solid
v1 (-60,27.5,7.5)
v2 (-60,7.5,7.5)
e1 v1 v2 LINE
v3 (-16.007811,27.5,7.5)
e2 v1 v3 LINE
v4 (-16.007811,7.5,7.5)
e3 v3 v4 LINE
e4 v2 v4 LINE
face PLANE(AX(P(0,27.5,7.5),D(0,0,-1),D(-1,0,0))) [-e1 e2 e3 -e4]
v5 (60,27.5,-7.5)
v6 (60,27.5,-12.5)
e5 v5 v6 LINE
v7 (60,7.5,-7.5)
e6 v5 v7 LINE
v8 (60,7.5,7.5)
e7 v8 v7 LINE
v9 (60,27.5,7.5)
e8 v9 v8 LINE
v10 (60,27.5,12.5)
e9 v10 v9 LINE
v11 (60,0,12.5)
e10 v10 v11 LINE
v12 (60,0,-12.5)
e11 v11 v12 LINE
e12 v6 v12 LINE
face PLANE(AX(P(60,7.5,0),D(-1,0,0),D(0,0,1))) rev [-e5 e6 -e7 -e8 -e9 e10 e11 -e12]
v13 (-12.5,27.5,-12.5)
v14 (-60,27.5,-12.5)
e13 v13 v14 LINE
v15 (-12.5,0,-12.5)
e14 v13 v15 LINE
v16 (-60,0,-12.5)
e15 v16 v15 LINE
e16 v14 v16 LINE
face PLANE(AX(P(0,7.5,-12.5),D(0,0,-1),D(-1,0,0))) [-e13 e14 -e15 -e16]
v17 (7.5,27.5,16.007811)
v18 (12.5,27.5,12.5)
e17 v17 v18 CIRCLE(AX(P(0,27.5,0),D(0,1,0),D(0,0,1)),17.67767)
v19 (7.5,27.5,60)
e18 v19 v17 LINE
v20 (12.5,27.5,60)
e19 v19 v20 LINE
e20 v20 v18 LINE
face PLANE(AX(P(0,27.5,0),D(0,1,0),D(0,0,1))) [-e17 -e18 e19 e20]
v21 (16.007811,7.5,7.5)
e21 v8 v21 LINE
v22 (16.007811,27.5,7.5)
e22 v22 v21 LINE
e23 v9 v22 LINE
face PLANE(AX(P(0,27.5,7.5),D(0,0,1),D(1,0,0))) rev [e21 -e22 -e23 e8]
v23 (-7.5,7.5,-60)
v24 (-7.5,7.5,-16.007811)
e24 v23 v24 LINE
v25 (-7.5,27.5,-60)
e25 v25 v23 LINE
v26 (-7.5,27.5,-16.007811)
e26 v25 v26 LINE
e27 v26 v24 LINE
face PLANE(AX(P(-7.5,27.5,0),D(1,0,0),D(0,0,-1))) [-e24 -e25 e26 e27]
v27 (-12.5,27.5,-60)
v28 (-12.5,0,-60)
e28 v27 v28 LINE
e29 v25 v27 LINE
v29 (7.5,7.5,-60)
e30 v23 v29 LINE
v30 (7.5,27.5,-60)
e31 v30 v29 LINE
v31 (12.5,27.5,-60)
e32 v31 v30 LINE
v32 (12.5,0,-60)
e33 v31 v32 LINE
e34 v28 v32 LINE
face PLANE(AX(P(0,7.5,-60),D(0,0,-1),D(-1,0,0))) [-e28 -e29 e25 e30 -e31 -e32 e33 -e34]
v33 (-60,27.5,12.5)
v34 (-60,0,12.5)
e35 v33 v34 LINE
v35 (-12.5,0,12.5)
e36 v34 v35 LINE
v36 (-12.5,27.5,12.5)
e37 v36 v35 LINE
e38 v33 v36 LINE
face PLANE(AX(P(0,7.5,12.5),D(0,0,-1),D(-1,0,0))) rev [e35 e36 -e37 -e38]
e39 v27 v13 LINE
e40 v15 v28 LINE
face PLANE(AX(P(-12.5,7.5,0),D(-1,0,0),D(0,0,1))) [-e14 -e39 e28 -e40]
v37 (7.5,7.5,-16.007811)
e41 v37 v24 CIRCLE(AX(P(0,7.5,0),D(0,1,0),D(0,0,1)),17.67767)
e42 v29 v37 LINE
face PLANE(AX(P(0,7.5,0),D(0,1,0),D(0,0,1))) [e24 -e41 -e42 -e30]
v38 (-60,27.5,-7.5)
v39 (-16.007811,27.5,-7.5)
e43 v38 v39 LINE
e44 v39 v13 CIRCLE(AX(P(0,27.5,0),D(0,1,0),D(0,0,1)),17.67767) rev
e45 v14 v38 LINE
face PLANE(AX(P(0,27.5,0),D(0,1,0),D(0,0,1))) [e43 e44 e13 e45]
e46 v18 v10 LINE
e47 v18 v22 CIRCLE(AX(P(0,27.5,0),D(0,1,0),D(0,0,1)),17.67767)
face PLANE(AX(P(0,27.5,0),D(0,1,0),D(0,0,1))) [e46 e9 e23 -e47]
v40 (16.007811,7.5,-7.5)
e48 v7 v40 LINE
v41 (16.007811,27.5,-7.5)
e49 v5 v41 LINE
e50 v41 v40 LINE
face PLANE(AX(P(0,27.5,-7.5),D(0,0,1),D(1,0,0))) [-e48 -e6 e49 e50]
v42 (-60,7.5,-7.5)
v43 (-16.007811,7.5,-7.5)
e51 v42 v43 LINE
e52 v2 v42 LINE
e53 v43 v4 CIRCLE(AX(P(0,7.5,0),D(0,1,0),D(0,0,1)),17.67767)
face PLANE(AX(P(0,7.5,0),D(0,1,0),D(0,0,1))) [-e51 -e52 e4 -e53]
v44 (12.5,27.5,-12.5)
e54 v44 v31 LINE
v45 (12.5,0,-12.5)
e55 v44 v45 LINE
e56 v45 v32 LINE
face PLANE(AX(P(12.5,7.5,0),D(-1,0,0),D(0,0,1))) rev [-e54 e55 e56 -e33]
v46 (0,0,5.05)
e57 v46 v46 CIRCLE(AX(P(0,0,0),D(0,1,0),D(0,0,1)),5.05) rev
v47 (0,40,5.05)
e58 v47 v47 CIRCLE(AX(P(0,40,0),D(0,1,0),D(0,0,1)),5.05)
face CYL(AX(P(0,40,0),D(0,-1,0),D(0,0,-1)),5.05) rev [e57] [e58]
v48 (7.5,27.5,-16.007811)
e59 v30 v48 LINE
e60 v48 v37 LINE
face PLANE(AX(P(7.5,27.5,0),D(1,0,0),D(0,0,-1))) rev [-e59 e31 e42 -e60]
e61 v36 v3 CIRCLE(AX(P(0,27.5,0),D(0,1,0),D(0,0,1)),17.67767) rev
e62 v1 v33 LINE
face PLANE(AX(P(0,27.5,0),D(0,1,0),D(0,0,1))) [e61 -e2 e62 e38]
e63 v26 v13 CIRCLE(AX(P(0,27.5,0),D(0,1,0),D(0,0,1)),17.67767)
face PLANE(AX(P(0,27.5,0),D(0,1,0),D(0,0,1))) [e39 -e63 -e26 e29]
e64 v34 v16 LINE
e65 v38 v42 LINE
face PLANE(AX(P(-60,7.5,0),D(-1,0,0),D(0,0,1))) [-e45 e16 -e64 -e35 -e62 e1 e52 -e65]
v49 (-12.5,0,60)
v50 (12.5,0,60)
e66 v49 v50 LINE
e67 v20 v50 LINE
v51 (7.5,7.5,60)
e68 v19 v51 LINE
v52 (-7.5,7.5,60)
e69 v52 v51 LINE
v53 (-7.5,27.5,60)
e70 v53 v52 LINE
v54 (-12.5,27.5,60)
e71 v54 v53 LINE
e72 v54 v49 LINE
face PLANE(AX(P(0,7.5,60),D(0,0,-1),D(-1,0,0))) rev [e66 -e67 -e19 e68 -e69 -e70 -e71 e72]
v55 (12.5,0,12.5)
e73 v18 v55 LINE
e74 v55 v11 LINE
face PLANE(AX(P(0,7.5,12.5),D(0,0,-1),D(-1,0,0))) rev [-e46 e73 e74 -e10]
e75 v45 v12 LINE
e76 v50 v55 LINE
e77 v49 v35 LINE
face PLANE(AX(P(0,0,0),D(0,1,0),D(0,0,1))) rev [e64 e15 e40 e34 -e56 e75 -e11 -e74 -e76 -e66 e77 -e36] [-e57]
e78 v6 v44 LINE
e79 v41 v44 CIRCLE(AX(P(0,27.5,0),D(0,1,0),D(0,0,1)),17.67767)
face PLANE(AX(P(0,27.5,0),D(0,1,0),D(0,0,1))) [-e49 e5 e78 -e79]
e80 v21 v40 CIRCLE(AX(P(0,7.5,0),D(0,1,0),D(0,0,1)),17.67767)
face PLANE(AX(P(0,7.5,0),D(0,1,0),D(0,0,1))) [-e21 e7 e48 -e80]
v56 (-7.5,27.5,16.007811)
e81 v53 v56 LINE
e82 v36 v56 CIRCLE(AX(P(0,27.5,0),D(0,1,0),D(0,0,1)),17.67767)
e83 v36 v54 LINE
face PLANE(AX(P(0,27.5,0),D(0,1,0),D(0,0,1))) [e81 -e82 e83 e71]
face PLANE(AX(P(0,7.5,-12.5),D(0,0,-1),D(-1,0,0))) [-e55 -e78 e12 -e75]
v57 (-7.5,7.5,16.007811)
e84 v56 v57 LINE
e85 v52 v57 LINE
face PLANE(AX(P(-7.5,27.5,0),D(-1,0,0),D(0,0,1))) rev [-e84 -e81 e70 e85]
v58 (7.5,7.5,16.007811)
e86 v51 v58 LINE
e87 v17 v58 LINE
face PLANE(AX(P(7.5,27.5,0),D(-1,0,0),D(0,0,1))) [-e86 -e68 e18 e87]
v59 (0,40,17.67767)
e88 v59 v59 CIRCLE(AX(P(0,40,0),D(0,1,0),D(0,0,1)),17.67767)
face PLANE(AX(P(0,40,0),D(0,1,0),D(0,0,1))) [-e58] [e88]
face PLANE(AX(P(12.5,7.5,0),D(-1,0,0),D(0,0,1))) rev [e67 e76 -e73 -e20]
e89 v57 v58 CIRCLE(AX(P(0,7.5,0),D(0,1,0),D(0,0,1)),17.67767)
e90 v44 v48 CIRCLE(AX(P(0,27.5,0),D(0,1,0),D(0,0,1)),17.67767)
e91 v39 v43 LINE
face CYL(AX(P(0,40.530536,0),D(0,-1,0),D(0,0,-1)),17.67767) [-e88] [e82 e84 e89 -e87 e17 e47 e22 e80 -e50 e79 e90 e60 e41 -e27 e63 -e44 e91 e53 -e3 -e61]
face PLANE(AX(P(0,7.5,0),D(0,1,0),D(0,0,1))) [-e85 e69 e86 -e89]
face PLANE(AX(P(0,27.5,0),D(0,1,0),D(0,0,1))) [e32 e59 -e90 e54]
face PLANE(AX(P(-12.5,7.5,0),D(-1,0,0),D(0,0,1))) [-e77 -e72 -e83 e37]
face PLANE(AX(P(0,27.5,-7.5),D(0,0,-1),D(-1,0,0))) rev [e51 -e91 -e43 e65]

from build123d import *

# Parameters (mm, degrees)
BOSS_EXTRUDE1_DEPTH     = 7.5
BOSS_EXTRUDE1_2_DEPTH   = 7.5
BOSS_EXTRUDE1_3_DEPTH   = 7.5
BOSS_EXTRUDE1_4_DEPTH   = 7.5
SKETCH1_3_W             = 25
SKETCH1_3_H             = 25
SKETCH1_3_R             = 5.05
BOSS_EXTRUDE2_DEPTH     = 15
BOSS_EXTRUDE5_DEPTH     = 7.5
BOSS_EXTRUDE8_DEPTH     = 15
SKETCH1_8_R             = 17.67766953
BOSS_EXTRUDE9_DEPTH     = 40
BOSS_EXTRUDE10_DEPTH    = 20
CUT_EXTRUDE1_DEPTH      = 94.808315196
CUT_EXTRUDE1_DEPTH_BACK = 94.808315196
SKETCH1_9_R             = 5.05


# Read off the part's stored shape, not the designer's step: Boss-Extrude5
with BuildPart() as part:
    # Sketch1 → Boss-Extrude1 (new body)
    with BuildSketch(Plane(origin=(0, 0, 0), x_dir=(1, 0, 0), z_dir=(0, 1, 0))):
        with BuildLine():
            Line((-60, 12.5), (-60, -12.5))
            Line((-60, -12.5), (-12.5, -12.5))
            ThreePointArc((-12.5, -12.5), (-17.67766953, 0), (-12.5, 12.5))
            Line((-12.5, 12.5), (-60, 12.5))
        make_face()
    extrude(amount=BOSS_EXTRUDE1_DEPTH)



with BuildPart() as body_2:
    # Sketch1 → Boss-Extrude1 2 (new body)
    with BuildSketch(Plane(origin=(0, 0, 0), x_dir=(1, 0, 0), z_dir=(0, 1, 0))):
        with BuildLine():
            ThreePointArc((12.5, -12.5), (0, -17.67766953), (-12.5, -12.5))
            Line((-12.5, -12.5), (-12.5, -60))
            Line((-12.5, -60), (12.5, -60))
            Line((12.5, -60), (12.5, -12.5))
        make_face()
    extrude(amount=BOSS_EXTRUDE1_2_DEPTH)


with BuildPart() as body_3:
    # Sketch1 → Boss-Extrude1 3 (new body)
    with BuildSketch(Plane(origin=(0, 0, 0), x_dir=(1, 0, 0), z_dir=(0, 1, 0))):
        with BuildLine():
            ThreePointArc((12.5, 12.5), (17.67766953, 0), (12.5, -12.5))
            Line((12.5, -12.5), (60, -12.5))
            Line((60, -12.5), (60, 12.5))
            Line((60, 12.5), (12.5, 12.5))
        make_face()
    extrude(amount=BOSS_EXTRUDE1_3_DEPTH)


with BuildPart() as body_4:
    # Sketch1 → Boss-Extrude1 4 (new body)
    with BuildSketch(Plane(origin=(0, 0, 0), x_dir=(1, 0, 0), z_dir=(0, 1, 0))):
        with BuildLine():
            Line((-12.5, 60), (-12.5, 12.5))
            ThreePointArc((-12.5, 12.5), (0, 17.67766953), (12.5, 12.5))
            Line((12.5, 12.5), (12.5, 60))
            Line((12.5, 60), (-12.5, 60))
        make_face()
    extrude(amount=BOSS_EXTRUDE1_4_DEPTH)


with BuildPart() as body_5:
    # Sketch1<3> → Boss-Extrude2 (new body)
    with BuildSketch(Plane(origin=(0, 0, 0), x_dir=(1, 0, 0), z_dir=(0, 1, 0))):
        Rectangle(SKETCH1_3_W, SKETCH1_3_H)
        with Locations(Location((0, 0, 0), (0, 0, 270))):
            Circle(SKETCH1_3_R, mode=Mode.SUBTRACT)
    extrude(amount=BOSS_EXTRUDE2_DEPTH)


with BuildPart() as body_6:
    # Boss-Extrude5 outline → Boss-Extrude5 (new body)
    with BuildSketch(Plane(origin=(0, 0, 0), x_dir=(1, 0, 0), z_dir=(0, 1, 0))):
        with BuildLine():
            Line((-12.5, 60), (-12.5, 12.5))
            ThreePointArc((-12.5, 12.5), (0, 17.67766953), (12.5, 12.5))
            Line((12.5, 12.5), (12.5, 60))
            Line((12.5, 60), (-12.5, 60))
        make_face()
    extrude(amount=BOSS_EXTRUDE5_DEPTH)


with BuildPart() as part_1:
    add(part.part)

    add(body_2.part)  # Boss-Extrude8 merges body 2

    add(body_3.part)  # Boss-Extrude8 merges body 3

    add(body_4.part)  # Boss-Extrude8 merges body 4

    add(body_5.part)  # Boss-Extrude8 merges body 5

    add(body_6.part)  # Boss-Extrude8 merges body 6
    # Sketch1<7> → Boss-Extrude8 (add)
    with BuildSketch(Plane(origin=(0, 0, 0), x_dir=(1, 0, 0), z_dir=(0, 1, 0))):
        with BuildLine():
            ThreePointArc((-12.5, 12.5), (-17.67766953, 0), (-12.5, -12.5))
            Line((-12.5, -12.5), (-12.5, 12.5))
        make_face()
        with BuildLine():
            Line((12.5, -12.5), (-12.5, -12.5))
            ThreePointArc((-12.5, -12.5), (0, -17.67766953), (12.5, -12.5))
        make_face()
        with BuildLine():
            Line((12.5, 12.5), (12.5, -12.5))
            ThreePointArc((12.5, -12.5), (16.332037061, -6.764951252), (17.67766953, 0))
            ThreePointArc((17.67766953, 0), (16.332037061, 6.764951252), (12.5, 12.5))
        make_face()
        with BuildLine():
            ThreePointArc((12.5, 12.5), (0, 17.67766953), (-12.5, 12.5))
            Line((-12.5, 12.5), (12.5, 12.5))
        make_face()
    extrude(amount=BOSS_EXTRUDE8_DEPTH)

    # Sketch1<8> → Boss-Extrude9 (add)
    with BuildSketch(Plane(origin=(0, 0, 0), x_dir=(1, 0, 0), z_dir=(0, 1, 0))):
        with Locations(Location((0, 0, 0), (0, 0, 45))):
            Circle(SKETCH1_8_R)
    extrude(amount=BOSS_EXTRUDE9_DEPTH)

    # Sketch5 → Boss-Extrude10 (add)
    with BuildSketch(Plane(origin=(0, 7.5, 0), x_dir=(1, 0, 0), z_dir=(0, 1, 0))):
        with BuildLine():
            Line((-60, 7.5), (-16.007810594, 7.5))
            ThreePointArc((-16.007810594, 7.5), (-14.471482861, 10.152644177), (-12.5, 12.5))
            Line((-12.5, 12.5), (-60, 12.5))
            Line((-60, 12.5), (-60, 7.5))
        make_face()
        with BuildLine():
            Line((-12.5, 60), (-12.5, 12.5))
            ThreePointArc((-12.5, 12.5), (-10.152644177, 14.471482861), (-7.5, 16.007810594))
            Line((-7.5, 16.007810594), (-7.5, 60))
            Line((-7.5, 60), (-12.5, 60))
        make_face()
        with BuildLine():
            Line((7.5, 60), (7.5, 16.007810594))
            ThreePointArc((7.5, 16.007810594), (10.152644177, 14.471482861), (12.5, 12.5))
            Line((12.5, 12.5), (12.5, 60))
            Line((12.5, 60), (7.5, 60))
        make_face()
        with BuildLine():
            ThreePointArc((12.5, 12.5), (14.471482861, 10.152644177), (16.007810594, 7.5))
            Line((16.007810594, 7.5), (60, 7.5))
            Line((60, 7.5), (60, 12.5))
            Line((60, 12.5), (12.5, 12.5))
        make_face()
        with BuildLine():
            ThreePointArc((16.007810594, -7.5), (14.471482861, -10.152644177), (12.5, -12.5))
            Line((12.5, -12.5), (60, -12.5))
            Line((60, -12.5), (60, -7.5))
            Line((60, -7.5), (16.007810594, -7.5))
        make_face()
        with BuildLine():
            ThreePointArc((12.5, -12.5), (10.152644177, -14.471482861), (7.5, -16.007810594))
            Line((7.5, -16.007810594), (7.5, -60))
            Line((7.5, -60), (12.5, -60))
            Line((12.5, -60), (12.5, -12.5))
        make_face()
        with BuildLine():
            ThreePointArc((-7.5, -16.007810594), (-10.152644177, -14.471482861), (-12.5, -12.5))
            Line((-12.5, -12.5), (-12.5, -60))
            Line((-12.5, -60), (-7.5, -60))
            Line((-7.5, -60), (-7.5, -16.007810594))
        make_face()
        with BuildLine():
            Line((-60, -12.5), (-12.5, -12.5))
            ThreePointArc((-12.5, -12.5), (-14.471482861, -10.152644177), (-16.007810594, -7.5))
            Line((-16.007810594, -7.5), (-60, -7.5))
            Line((-60, -7.5), (-60, -12.5))
        make_face()
    extrude(amount=BOSS_EXTRUDE10_DEPTH)

    # Sketch1<9> → Cut-Extrude1 (cut, two sides: drawn at the far end of the back side and taken through both)
    with BuildSketch(Plane(origin=(0, 0, 0), x_dir=(1, 0, 0), z_dir=(0, 1, 0)).offset(-CUT_EXTRUDE1_DEPTH_BACK)):
        with Locations(Location((0, 0, 0), (0, 0, 270))):
            Circle(SKETCH1_9_R)
    extrude(amount=CUT_EXTRUDE1_DEPTH + CUT_EXTRUDE1_DEPTH_BACK, mode=Mode.SUBTRACT)


solid = part_1.part
